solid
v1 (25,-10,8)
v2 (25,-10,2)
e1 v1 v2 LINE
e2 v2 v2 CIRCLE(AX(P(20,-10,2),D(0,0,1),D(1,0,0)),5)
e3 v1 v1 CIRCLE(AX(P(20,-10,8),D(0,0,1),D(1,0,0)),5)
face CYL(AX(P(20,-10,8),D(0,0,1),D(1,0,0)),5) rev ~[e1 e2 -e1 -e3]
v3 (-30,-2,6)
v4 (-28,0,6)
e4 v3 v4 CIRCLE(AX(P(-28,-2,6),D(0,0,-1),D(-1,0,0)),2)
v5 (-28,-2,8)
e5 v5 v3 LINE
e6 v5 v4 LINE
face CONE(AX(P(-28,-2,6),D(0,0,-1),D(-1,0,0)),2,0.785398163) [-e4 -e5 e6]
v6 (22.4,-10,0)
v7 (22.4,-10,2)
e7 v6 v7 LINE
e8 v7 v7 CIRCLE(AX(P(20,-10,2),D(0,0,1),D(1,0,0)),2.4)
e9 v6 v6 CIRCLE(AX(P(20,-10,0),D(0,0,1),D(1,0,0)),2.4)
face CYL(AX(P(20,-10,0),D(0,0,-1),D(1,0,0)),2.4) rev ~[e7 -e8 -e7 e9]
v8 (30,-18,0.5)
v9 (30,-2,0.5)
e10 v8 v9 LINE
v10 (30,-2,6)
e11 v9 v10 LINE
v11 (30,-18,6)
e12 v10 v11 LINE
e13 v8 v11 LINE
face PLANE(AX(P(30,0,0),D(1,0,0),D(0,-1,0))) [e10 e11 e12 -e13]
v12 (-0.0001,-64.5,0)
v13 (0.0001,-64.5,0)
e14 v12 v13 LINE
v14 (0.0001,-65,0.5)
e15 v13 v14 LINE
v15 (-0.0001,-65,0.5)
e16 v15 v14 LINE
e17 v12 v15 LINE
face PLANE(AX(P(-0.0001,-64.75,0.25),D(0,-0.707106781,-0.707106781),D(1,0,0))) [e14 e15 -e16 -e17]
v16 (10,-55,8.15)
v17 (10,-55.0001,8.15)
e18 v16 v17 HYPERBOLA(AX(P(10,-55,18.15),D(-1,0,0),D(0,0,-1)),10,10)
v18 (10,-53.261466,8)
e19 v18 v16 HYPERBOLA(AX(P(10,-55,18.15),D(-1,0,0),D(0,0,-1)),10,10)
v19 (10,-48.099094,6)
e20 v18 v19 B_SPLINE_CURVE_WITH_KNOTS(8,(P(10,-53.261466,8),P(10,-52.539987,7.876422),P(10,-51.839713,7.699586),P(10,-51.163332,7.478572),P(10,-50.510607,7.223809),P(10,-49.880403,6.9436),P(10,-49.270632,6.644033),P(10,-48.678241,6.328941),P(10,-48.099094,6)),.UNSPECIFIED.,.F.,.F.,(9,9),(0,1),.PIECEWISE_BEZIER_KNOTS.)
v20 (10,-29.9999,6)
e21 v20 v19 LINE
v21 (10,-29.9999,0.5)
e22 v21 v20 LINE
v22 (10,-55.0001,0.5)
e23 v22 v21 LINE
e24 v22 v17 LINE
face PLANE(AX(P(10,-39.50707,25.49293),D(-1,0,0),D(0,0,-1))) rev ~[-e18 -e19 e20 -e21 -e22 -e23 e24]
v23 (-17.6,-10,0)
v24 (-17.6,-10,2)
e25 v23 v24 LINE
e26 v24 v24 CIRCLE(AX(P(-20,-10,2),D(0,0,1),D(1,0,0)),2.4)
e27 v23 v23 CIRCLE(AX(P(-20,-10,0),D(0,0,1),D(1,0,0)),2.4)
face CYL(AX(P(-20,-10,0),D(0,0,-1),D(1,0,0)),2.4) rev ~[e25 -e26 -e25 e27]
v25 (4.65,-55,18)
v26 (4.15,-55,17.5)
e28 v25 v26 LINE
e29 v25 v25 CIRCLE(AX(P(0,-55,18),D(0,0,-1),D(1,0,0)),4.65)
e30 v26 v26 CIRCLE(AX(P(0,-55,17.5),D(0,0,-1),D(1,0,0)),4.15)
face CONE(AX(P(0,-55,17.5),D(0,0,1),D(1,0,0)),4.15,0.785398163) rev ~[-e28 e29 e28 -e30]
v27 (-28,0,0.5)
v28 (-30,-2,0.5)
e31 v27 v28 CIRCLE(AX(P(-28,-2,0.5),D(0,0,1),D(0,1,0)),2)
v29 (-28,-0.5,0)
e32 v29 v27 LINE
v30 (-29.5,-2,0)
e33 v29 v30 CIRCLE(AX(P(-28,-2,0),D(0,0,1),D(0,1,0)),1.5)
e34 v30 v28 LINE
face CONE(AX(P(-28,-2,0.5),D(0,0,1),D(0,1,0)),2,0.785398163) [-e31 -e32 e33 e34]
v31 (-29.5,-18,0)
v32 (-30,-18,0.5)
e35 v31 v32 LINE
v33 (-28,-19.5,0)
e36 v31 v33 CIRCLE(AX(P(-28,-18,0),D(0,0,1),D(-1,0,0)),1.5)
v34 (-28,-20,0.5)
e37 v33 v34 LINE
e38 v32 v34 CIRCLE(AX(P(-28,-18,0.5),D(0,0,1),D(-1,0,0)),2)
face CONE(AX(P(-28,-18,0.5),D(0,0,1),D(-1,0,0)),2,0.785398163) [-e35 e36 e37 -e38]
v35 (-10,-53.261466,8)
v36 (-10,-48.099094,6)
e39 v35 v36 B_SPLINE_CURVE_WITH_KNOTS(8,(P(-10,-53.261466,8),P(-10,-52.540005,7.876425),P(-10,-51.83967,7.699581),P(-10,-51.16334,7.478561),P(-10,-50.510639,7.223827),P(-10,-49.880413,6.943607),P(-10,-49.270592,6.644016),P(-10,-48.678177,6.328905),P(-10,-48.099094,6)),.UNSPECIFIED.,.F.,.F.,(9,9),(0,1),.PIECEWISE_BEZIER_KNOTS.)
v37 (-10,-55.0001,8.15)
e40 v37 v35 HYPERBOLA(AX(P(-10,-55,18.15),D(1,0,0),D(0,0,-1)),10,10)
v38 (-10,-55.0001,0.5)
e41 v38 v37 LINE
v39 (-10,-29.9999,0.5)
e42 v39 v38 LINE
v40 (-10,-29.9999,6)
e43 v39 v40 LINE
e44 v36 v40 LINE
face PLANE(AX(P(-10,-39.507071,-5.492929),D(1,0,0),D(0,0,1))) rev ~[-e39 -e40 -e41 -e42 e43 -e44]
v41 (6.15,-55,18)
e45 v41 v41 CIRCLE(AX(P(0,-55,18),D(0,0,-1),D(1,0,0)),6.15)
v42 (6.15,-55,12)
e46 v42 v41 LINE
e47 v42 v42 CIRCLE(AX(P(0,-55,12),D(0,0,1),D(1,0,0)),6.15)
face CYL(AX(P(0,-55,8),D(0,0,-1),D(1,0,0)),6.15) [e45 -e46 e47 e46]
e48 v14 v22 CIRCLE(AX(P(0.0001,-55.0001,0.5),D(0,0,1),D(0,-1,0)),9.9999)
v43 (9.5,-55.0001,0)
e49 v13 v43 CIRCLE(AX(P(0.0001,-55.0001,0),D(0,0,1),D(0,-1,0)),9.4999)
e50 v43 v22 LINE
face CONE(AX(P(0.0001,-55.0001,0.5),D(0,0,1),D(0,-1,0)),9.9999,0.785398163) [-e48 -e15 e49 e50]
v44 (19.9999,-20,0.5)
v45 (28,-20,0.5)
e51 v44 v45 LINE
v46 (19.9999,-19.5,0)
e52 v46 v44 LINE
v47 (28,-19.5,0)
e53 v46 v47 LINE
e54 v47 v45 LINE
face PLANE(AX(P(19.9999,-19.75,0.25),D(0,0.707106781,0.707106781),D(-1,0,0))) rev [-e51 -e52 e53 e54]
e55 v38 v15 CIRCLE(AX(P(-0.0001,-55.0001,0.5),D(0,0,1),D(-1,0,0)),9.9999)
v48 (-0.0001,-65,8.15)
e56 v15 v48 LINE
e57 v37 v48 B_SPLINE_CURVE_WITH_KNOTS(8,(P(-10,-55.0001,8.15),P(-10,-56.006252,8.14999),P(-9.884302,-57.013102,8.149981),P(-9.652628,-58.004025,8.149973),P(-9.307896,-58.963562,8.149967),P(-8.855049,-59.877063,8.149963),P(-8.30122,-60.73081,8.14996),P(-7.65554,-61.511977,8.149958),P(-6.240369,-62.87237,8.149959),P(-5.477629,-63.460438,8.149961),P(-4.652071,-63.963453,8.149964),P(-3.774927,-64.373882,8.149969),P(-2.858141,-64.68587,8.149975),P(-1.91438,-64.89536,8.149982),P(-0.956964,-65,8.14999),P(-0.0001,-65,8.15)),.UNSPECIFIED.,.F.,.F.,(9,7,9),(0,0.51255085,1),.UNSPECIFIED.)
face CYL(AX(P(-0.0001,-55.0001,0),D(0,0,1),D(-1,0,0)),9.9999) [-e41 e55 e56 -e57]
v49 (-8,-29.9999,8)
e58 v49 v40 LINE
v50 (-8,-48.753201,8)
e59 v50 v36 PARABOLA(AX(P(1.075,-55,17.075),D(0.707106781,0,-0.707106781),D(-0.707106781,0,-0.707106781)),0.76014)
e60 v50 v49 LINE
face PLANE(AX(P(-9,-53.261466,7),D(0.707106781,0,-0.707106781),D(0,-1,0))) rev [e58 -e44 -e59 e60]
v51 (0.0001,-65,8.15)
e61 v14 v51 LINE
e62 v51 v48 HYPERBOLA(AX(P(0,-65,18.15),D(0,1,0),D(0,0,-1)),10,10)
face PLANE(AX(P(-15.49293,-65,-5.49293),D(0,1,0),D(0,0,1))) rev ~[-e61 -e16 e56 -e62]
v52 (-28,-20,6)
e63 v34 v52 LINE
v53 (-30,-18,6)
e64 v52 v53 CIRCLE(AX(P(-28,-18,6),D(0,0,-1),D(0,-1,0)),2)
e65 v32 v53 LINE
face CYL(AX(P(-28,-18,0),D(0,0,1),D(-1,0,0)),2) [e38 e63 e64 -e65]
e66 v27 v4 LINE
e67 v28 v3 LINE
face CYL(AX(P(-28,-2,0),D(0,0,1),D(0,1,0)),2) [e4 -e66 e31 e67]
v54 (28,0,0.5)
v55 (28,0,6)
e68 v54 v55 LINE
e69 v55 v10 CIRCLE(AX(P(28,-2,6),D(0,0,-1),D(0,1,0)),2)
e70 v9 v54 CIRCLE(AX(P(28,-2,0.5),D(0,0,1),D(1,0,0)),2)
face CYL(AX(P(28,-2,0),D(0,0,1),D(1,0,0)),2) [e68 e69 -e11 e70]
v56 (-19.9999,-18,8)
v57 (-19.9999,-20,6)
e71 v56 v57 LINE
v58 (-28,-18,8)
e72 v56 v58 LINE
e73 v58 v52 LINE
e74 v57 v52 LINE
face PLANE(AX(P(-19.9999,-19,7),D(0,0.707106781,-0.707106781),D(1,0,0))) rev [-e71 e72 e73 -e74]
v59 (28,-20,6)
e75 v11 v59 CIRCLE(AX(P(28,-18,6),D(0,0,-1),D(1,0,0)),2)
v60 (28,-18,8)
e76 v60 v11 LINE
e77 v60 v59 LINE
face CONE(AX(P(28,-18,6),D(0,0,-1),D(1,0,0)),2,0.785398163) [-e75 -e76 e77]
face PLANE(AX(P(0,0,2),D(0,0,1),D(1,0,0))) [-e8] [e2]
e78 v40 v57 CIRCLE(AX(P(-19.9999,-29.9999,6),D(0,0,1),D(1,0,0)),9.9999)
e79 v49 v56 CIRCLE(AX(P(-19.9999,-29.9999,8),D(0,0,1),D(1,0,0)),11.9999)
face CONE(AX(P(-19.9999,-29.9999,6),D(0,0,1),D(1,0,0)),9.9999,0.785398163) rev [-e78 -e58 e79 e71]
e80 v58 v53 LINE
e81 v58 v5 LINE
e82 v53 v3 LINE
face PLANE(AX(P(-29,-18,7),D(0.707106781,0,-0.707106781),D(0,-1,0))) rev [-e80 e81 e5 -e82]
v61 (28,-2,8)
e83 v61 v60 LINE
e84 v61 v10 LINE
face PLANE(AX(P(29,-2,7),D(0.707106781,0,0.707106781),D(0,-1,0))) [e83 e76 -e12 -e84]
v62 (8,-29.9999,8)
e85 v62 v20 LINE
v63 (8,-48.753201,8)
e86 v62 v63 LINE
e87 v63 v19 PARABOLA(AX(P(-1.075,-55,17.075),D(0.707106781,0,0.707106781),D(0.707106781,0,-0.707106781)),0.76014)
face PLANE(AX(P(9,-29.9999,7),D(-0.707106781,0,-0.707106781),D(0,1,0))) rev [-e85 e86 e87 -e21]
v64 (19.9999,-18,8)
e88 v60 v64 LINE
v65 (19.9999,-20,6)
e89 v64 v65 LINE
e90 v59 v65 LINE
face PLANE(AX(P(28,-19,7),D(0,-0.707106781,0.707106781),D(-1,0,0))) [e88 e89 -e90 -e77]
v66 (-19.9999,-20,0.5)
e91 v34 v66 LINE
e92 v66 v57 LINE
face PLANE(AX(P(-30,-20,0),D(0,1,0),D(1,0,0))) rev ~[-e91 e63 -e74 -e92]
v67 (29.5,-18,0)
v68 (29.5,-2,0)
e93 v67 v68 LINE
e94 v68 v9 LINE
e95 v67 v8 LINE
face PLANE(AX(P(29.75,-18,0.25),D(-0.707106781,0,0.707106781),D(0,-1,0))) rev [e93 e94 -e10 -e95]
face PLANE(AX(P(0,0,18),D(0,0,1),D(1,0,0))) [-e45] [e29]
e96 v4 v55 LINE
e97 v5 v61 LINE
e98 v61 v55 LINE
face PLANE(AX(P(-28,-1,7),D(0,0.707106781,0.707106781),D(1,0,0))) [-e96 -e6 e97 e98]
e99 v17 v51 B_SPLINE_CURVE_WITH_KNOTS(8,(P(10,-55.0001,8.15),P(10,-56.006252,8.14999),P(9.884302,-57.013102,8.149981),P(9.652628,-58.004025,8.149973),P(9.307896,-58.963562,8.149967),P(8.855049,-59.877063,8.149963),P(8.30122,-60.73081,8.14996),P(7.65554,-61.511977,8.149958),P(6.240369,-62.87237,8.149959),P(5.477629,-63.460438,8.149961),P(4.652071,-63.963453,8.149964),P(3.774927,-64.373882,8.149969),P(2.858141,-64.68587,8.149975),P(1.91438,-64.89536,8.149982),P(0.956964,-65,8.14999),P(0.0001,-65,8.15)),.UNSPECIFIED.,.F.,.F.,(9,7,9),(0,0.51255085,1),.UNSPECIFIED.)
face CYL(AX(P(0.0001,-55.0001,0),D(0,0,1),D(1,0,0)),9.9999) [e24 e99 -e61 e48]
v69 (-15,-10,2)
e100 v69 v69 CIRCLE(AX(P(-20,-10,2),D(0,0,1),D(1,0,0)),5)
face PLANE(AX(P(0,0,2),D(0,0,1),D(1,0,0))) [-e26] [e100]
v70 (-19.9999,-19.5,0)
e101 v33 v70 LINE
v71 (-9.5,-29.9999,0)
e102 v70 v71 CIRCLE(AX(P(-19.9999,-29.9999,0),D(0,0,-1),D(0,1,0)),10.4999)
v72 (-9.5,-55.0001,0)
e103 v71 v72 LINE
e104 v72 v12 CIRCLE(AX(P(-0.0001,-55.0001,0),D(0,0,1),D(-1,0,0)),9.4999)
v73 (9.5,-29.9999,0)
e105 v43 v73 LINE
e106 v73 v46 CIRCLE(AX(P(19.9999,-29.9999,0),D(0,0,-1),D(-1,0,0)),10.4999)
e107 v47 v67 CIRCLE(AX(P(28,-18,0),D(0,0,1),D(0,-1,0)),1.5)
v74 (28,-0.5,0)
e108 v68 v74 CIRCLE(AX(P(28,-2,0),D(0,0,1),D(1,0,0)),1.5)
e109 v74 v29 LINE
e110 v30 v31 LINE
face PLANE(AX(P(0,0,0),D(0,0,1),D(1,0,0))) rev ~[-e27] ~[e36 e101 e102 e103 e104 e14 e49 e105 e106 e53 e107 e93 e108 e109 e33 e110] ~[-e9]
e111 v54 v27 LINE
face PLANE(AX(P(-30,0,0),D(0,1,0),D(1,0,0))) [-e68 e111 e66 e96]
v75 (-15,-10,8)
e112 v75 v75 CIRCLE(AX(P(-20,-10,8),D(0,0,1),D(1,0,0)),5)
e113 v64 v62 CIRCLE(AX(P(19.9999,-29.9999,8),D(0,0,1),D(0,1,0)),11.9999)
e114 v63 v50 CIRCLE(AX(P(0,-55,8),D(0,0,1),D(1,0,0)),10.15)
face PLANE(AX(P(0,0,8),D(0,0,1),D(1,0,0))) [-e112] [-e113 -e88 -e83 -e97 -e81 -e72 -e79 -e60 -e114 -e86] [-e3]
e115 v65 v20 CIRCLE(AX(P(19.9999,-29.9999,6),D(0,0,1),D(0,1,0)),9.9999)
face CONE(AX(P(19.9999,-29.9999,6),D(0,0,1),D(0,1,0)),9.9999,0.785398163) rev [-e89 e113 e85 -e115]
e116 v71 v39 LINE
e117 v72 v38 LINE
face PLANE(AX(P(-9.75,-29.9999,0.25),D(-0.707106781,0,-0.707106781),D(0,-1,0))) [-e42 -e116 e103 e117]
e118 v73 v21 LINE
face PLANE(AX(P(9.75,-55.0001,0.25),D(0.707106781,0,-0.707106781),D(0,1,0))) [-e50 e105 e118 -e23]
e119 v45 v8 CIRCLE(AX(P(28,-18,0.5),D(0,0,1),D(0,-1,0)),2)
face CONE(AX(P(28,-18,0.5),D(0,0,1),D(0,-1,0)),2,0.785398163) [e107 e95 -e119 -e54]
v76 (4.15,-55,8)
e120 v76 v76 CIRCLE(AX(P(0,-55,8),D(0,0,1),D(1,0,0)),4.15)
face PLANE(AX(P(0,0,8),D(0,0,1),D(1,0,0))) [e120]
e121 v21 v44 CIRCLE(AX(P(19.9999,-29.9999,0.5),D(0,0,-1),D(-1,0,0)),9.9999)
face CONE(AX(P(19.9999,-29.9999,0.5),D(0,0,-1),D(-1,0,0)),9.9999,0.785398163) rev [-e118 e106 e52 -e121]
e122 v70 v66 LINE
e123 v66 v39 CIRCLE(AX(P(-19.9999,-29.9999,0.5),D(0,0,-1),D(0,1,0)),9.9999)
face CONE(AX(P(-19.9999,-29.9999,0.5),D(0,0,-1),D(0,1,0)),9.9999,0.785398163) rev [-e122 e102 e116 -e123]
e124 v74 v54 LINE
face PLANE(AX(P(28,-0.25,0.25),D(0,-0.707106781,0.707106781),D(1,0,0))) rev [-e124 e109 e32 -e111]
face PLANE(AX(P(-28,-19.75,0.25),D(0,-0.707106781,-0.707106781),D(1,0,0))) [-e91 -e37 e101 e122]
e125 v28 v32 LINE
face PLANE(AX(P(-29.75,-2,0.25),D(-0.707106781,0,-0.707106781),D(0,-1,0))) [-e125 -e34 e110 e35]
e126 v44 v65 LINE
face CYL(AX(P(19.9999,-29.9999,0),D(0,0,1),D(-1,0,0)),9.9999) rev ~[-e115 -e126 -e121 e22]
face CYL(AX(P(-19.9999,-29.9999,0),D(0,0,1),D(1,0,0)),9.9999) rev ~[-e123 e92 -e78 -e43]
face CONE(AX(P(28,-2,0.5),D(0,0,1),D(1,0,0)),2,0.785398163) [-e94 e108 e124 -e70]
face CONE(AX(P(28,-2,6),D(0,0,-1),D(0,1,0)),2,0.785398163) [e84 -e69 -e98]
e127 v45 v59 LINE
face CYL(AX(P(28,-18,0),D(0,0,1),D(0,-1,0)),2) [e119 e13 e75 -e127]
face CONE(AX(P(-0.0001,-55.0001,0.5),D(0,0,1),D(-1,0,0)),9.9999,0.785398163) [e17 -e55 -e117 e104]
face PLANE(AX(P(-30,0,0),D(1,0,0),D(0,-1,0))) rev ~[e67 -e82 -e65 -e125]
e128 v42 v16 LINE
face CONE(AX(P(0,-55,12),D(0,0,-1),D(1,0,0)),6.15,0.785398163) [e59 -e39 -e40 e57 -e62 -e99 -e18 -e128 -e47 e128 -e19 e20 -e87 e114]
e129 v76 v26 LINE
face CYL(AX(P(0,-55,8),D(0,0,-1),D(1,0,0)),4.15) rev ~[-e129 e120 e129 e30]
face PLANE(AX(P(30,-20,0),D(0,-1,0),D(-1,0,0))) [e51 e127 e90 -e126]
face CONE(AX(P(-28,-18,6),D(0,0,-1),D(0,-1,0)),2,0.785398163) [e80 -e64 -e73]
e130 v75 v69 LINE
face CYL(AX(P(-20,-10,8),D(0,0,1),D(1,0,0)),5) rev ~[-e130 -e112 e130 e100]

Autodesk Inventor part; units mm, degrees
ref_plane "YZ Plane" through (0, 0, 0) normal (1, 0, 0) x (0, 1, 0)
ref_plane "XZ Plane" through (0, 0, 0) normal (0, 1, 0) x (-1, 0, 0)
ref_plane "XY Plane" through (0, 0, 0) normal (0, 0, 1) x (1, 0, 0)
sketch "Sketch1" plane through (0, 0, 0) normal (0, 0, 1) x (1, 0, 0)
  line L0 (-42, 0) -> (42, 0) projected
  line L1 (-30, 0) -> (-30, -20)
  line L2 (-30, -20) -> (-10, -20)
  line L3 (-10, -20) -> (-10, -65)
  line L4 (-10, -65) -> (0, -65)
  line L5 (0, -78) -> (0, 13) projected
  line L6 (-30, 0) -> (0, 0)
  line L7 (30, 0) -> (30, -20)
  line L8 (30, -20) -> (10, -20)
  line L9 (10, -20) -> (10, -65)
  line L10 (10, -65) -> (0, -65)
  line L11 (30, 0) -> (0, 0)
  line L12 (-30, -10) -> (30, -10) construction
  circle A0 centre (-20, -10) radius 2.4
  circle A1 centre (20, -10) radius 2.4
  dimension "d0" = 10
  dimension "d1" = 20
  dimension "d2" = 65
  dimension "d3" = 30
  dimension "d4" = 10
  dimension "d5" = 4.8
  dimension "d6" = 4.8
  dimension "d7" = 10
  dimension "d8" = 10
extrude "Extrusion1" add sketch "Sketch1" along normal blind 8
sketch "Sketch2" plane through (0, 0, 8) normal (0, 0, 1) x (1, 0, 0)
  circle A0 centre (-20, -10) radius 2.4 projected
  circle A1 centre (20, -10) radius 2.4 projected
  circle A2 centre (-20, -10) radius 5
  circle A3 centre (20, -10) radius 5
  point P0 (0, 0)
  dimension "d11" = 10
  dimension "d12" = 10
extrude "Extrusion2" cut sketch "Sketch2" against normal blind 6
sketch "Sketch3" plane through (0, 0, 8) normal (0, 0, 1) x (1, 0, 0)
  line L0 (0, -78) -> (0, 13) projected
  circle A0 centre (0, -55) radius 4.15
  circle A1 centre (-20, -10) radius 2.4 projected
  circle A2 centre (0, -55) radius 6.15
  point P0 (0, 0)
  dimension "d15" = 45
  dimension "d16" = 8.3
  dimension "d17" = 2
extrude "Extrusion3" add sketch "Sketch3" along normal blind 10 contours A2 L0 A0 | L0 A0 A2
chamfer "Chamfer1" distance 0.5 angle 45 1 edges at (-4.15, -55, 18)
chamfer "Chamfer2" distance 4 angle 45 1 edges at (-6.15, -55, 8)
fillet "Fillet1" radius 10 4 edges at (10, -65, 4) (-10, -65, 4) (-10, -20, 4) (10, -20, 4)
fillet "Fillet2" radius 2 4 edges at (30, -20, 4) (30, 0, 4) (-30, 0, 4) (-30, -20, 4)
chamfer "Chamfer3" distance 0.5 angle 45 9 edges at (-7.0711, -62.0711, 0) (-10, -42.5, 0) (7.0711, -62.0711, 0) (10, -42.5, 0) (23.9999, -20, 0) (-23.9999, -20, 0) (-30, -10, 0) (0, 0, 0) (30, -10, 0)
chamfer "Chamfer4" distance 2 angle 45 9 edges at (-12.9289, -22.9289, 8) (-23.9999, -20, 8) (-10, -41.6307, 8) (-30, -10, 8) (0, 0, 8) (10, -41.6307, 8) (12.9289, -22.9289, 8) (23.9999, -20, 8) (30, -10, 8)
equation "\"d4\" = 0.5 * d1"
equation "\"d8\" = d7"
equation "\"d12\" = d11"
properties part number "RodHolder_2"
